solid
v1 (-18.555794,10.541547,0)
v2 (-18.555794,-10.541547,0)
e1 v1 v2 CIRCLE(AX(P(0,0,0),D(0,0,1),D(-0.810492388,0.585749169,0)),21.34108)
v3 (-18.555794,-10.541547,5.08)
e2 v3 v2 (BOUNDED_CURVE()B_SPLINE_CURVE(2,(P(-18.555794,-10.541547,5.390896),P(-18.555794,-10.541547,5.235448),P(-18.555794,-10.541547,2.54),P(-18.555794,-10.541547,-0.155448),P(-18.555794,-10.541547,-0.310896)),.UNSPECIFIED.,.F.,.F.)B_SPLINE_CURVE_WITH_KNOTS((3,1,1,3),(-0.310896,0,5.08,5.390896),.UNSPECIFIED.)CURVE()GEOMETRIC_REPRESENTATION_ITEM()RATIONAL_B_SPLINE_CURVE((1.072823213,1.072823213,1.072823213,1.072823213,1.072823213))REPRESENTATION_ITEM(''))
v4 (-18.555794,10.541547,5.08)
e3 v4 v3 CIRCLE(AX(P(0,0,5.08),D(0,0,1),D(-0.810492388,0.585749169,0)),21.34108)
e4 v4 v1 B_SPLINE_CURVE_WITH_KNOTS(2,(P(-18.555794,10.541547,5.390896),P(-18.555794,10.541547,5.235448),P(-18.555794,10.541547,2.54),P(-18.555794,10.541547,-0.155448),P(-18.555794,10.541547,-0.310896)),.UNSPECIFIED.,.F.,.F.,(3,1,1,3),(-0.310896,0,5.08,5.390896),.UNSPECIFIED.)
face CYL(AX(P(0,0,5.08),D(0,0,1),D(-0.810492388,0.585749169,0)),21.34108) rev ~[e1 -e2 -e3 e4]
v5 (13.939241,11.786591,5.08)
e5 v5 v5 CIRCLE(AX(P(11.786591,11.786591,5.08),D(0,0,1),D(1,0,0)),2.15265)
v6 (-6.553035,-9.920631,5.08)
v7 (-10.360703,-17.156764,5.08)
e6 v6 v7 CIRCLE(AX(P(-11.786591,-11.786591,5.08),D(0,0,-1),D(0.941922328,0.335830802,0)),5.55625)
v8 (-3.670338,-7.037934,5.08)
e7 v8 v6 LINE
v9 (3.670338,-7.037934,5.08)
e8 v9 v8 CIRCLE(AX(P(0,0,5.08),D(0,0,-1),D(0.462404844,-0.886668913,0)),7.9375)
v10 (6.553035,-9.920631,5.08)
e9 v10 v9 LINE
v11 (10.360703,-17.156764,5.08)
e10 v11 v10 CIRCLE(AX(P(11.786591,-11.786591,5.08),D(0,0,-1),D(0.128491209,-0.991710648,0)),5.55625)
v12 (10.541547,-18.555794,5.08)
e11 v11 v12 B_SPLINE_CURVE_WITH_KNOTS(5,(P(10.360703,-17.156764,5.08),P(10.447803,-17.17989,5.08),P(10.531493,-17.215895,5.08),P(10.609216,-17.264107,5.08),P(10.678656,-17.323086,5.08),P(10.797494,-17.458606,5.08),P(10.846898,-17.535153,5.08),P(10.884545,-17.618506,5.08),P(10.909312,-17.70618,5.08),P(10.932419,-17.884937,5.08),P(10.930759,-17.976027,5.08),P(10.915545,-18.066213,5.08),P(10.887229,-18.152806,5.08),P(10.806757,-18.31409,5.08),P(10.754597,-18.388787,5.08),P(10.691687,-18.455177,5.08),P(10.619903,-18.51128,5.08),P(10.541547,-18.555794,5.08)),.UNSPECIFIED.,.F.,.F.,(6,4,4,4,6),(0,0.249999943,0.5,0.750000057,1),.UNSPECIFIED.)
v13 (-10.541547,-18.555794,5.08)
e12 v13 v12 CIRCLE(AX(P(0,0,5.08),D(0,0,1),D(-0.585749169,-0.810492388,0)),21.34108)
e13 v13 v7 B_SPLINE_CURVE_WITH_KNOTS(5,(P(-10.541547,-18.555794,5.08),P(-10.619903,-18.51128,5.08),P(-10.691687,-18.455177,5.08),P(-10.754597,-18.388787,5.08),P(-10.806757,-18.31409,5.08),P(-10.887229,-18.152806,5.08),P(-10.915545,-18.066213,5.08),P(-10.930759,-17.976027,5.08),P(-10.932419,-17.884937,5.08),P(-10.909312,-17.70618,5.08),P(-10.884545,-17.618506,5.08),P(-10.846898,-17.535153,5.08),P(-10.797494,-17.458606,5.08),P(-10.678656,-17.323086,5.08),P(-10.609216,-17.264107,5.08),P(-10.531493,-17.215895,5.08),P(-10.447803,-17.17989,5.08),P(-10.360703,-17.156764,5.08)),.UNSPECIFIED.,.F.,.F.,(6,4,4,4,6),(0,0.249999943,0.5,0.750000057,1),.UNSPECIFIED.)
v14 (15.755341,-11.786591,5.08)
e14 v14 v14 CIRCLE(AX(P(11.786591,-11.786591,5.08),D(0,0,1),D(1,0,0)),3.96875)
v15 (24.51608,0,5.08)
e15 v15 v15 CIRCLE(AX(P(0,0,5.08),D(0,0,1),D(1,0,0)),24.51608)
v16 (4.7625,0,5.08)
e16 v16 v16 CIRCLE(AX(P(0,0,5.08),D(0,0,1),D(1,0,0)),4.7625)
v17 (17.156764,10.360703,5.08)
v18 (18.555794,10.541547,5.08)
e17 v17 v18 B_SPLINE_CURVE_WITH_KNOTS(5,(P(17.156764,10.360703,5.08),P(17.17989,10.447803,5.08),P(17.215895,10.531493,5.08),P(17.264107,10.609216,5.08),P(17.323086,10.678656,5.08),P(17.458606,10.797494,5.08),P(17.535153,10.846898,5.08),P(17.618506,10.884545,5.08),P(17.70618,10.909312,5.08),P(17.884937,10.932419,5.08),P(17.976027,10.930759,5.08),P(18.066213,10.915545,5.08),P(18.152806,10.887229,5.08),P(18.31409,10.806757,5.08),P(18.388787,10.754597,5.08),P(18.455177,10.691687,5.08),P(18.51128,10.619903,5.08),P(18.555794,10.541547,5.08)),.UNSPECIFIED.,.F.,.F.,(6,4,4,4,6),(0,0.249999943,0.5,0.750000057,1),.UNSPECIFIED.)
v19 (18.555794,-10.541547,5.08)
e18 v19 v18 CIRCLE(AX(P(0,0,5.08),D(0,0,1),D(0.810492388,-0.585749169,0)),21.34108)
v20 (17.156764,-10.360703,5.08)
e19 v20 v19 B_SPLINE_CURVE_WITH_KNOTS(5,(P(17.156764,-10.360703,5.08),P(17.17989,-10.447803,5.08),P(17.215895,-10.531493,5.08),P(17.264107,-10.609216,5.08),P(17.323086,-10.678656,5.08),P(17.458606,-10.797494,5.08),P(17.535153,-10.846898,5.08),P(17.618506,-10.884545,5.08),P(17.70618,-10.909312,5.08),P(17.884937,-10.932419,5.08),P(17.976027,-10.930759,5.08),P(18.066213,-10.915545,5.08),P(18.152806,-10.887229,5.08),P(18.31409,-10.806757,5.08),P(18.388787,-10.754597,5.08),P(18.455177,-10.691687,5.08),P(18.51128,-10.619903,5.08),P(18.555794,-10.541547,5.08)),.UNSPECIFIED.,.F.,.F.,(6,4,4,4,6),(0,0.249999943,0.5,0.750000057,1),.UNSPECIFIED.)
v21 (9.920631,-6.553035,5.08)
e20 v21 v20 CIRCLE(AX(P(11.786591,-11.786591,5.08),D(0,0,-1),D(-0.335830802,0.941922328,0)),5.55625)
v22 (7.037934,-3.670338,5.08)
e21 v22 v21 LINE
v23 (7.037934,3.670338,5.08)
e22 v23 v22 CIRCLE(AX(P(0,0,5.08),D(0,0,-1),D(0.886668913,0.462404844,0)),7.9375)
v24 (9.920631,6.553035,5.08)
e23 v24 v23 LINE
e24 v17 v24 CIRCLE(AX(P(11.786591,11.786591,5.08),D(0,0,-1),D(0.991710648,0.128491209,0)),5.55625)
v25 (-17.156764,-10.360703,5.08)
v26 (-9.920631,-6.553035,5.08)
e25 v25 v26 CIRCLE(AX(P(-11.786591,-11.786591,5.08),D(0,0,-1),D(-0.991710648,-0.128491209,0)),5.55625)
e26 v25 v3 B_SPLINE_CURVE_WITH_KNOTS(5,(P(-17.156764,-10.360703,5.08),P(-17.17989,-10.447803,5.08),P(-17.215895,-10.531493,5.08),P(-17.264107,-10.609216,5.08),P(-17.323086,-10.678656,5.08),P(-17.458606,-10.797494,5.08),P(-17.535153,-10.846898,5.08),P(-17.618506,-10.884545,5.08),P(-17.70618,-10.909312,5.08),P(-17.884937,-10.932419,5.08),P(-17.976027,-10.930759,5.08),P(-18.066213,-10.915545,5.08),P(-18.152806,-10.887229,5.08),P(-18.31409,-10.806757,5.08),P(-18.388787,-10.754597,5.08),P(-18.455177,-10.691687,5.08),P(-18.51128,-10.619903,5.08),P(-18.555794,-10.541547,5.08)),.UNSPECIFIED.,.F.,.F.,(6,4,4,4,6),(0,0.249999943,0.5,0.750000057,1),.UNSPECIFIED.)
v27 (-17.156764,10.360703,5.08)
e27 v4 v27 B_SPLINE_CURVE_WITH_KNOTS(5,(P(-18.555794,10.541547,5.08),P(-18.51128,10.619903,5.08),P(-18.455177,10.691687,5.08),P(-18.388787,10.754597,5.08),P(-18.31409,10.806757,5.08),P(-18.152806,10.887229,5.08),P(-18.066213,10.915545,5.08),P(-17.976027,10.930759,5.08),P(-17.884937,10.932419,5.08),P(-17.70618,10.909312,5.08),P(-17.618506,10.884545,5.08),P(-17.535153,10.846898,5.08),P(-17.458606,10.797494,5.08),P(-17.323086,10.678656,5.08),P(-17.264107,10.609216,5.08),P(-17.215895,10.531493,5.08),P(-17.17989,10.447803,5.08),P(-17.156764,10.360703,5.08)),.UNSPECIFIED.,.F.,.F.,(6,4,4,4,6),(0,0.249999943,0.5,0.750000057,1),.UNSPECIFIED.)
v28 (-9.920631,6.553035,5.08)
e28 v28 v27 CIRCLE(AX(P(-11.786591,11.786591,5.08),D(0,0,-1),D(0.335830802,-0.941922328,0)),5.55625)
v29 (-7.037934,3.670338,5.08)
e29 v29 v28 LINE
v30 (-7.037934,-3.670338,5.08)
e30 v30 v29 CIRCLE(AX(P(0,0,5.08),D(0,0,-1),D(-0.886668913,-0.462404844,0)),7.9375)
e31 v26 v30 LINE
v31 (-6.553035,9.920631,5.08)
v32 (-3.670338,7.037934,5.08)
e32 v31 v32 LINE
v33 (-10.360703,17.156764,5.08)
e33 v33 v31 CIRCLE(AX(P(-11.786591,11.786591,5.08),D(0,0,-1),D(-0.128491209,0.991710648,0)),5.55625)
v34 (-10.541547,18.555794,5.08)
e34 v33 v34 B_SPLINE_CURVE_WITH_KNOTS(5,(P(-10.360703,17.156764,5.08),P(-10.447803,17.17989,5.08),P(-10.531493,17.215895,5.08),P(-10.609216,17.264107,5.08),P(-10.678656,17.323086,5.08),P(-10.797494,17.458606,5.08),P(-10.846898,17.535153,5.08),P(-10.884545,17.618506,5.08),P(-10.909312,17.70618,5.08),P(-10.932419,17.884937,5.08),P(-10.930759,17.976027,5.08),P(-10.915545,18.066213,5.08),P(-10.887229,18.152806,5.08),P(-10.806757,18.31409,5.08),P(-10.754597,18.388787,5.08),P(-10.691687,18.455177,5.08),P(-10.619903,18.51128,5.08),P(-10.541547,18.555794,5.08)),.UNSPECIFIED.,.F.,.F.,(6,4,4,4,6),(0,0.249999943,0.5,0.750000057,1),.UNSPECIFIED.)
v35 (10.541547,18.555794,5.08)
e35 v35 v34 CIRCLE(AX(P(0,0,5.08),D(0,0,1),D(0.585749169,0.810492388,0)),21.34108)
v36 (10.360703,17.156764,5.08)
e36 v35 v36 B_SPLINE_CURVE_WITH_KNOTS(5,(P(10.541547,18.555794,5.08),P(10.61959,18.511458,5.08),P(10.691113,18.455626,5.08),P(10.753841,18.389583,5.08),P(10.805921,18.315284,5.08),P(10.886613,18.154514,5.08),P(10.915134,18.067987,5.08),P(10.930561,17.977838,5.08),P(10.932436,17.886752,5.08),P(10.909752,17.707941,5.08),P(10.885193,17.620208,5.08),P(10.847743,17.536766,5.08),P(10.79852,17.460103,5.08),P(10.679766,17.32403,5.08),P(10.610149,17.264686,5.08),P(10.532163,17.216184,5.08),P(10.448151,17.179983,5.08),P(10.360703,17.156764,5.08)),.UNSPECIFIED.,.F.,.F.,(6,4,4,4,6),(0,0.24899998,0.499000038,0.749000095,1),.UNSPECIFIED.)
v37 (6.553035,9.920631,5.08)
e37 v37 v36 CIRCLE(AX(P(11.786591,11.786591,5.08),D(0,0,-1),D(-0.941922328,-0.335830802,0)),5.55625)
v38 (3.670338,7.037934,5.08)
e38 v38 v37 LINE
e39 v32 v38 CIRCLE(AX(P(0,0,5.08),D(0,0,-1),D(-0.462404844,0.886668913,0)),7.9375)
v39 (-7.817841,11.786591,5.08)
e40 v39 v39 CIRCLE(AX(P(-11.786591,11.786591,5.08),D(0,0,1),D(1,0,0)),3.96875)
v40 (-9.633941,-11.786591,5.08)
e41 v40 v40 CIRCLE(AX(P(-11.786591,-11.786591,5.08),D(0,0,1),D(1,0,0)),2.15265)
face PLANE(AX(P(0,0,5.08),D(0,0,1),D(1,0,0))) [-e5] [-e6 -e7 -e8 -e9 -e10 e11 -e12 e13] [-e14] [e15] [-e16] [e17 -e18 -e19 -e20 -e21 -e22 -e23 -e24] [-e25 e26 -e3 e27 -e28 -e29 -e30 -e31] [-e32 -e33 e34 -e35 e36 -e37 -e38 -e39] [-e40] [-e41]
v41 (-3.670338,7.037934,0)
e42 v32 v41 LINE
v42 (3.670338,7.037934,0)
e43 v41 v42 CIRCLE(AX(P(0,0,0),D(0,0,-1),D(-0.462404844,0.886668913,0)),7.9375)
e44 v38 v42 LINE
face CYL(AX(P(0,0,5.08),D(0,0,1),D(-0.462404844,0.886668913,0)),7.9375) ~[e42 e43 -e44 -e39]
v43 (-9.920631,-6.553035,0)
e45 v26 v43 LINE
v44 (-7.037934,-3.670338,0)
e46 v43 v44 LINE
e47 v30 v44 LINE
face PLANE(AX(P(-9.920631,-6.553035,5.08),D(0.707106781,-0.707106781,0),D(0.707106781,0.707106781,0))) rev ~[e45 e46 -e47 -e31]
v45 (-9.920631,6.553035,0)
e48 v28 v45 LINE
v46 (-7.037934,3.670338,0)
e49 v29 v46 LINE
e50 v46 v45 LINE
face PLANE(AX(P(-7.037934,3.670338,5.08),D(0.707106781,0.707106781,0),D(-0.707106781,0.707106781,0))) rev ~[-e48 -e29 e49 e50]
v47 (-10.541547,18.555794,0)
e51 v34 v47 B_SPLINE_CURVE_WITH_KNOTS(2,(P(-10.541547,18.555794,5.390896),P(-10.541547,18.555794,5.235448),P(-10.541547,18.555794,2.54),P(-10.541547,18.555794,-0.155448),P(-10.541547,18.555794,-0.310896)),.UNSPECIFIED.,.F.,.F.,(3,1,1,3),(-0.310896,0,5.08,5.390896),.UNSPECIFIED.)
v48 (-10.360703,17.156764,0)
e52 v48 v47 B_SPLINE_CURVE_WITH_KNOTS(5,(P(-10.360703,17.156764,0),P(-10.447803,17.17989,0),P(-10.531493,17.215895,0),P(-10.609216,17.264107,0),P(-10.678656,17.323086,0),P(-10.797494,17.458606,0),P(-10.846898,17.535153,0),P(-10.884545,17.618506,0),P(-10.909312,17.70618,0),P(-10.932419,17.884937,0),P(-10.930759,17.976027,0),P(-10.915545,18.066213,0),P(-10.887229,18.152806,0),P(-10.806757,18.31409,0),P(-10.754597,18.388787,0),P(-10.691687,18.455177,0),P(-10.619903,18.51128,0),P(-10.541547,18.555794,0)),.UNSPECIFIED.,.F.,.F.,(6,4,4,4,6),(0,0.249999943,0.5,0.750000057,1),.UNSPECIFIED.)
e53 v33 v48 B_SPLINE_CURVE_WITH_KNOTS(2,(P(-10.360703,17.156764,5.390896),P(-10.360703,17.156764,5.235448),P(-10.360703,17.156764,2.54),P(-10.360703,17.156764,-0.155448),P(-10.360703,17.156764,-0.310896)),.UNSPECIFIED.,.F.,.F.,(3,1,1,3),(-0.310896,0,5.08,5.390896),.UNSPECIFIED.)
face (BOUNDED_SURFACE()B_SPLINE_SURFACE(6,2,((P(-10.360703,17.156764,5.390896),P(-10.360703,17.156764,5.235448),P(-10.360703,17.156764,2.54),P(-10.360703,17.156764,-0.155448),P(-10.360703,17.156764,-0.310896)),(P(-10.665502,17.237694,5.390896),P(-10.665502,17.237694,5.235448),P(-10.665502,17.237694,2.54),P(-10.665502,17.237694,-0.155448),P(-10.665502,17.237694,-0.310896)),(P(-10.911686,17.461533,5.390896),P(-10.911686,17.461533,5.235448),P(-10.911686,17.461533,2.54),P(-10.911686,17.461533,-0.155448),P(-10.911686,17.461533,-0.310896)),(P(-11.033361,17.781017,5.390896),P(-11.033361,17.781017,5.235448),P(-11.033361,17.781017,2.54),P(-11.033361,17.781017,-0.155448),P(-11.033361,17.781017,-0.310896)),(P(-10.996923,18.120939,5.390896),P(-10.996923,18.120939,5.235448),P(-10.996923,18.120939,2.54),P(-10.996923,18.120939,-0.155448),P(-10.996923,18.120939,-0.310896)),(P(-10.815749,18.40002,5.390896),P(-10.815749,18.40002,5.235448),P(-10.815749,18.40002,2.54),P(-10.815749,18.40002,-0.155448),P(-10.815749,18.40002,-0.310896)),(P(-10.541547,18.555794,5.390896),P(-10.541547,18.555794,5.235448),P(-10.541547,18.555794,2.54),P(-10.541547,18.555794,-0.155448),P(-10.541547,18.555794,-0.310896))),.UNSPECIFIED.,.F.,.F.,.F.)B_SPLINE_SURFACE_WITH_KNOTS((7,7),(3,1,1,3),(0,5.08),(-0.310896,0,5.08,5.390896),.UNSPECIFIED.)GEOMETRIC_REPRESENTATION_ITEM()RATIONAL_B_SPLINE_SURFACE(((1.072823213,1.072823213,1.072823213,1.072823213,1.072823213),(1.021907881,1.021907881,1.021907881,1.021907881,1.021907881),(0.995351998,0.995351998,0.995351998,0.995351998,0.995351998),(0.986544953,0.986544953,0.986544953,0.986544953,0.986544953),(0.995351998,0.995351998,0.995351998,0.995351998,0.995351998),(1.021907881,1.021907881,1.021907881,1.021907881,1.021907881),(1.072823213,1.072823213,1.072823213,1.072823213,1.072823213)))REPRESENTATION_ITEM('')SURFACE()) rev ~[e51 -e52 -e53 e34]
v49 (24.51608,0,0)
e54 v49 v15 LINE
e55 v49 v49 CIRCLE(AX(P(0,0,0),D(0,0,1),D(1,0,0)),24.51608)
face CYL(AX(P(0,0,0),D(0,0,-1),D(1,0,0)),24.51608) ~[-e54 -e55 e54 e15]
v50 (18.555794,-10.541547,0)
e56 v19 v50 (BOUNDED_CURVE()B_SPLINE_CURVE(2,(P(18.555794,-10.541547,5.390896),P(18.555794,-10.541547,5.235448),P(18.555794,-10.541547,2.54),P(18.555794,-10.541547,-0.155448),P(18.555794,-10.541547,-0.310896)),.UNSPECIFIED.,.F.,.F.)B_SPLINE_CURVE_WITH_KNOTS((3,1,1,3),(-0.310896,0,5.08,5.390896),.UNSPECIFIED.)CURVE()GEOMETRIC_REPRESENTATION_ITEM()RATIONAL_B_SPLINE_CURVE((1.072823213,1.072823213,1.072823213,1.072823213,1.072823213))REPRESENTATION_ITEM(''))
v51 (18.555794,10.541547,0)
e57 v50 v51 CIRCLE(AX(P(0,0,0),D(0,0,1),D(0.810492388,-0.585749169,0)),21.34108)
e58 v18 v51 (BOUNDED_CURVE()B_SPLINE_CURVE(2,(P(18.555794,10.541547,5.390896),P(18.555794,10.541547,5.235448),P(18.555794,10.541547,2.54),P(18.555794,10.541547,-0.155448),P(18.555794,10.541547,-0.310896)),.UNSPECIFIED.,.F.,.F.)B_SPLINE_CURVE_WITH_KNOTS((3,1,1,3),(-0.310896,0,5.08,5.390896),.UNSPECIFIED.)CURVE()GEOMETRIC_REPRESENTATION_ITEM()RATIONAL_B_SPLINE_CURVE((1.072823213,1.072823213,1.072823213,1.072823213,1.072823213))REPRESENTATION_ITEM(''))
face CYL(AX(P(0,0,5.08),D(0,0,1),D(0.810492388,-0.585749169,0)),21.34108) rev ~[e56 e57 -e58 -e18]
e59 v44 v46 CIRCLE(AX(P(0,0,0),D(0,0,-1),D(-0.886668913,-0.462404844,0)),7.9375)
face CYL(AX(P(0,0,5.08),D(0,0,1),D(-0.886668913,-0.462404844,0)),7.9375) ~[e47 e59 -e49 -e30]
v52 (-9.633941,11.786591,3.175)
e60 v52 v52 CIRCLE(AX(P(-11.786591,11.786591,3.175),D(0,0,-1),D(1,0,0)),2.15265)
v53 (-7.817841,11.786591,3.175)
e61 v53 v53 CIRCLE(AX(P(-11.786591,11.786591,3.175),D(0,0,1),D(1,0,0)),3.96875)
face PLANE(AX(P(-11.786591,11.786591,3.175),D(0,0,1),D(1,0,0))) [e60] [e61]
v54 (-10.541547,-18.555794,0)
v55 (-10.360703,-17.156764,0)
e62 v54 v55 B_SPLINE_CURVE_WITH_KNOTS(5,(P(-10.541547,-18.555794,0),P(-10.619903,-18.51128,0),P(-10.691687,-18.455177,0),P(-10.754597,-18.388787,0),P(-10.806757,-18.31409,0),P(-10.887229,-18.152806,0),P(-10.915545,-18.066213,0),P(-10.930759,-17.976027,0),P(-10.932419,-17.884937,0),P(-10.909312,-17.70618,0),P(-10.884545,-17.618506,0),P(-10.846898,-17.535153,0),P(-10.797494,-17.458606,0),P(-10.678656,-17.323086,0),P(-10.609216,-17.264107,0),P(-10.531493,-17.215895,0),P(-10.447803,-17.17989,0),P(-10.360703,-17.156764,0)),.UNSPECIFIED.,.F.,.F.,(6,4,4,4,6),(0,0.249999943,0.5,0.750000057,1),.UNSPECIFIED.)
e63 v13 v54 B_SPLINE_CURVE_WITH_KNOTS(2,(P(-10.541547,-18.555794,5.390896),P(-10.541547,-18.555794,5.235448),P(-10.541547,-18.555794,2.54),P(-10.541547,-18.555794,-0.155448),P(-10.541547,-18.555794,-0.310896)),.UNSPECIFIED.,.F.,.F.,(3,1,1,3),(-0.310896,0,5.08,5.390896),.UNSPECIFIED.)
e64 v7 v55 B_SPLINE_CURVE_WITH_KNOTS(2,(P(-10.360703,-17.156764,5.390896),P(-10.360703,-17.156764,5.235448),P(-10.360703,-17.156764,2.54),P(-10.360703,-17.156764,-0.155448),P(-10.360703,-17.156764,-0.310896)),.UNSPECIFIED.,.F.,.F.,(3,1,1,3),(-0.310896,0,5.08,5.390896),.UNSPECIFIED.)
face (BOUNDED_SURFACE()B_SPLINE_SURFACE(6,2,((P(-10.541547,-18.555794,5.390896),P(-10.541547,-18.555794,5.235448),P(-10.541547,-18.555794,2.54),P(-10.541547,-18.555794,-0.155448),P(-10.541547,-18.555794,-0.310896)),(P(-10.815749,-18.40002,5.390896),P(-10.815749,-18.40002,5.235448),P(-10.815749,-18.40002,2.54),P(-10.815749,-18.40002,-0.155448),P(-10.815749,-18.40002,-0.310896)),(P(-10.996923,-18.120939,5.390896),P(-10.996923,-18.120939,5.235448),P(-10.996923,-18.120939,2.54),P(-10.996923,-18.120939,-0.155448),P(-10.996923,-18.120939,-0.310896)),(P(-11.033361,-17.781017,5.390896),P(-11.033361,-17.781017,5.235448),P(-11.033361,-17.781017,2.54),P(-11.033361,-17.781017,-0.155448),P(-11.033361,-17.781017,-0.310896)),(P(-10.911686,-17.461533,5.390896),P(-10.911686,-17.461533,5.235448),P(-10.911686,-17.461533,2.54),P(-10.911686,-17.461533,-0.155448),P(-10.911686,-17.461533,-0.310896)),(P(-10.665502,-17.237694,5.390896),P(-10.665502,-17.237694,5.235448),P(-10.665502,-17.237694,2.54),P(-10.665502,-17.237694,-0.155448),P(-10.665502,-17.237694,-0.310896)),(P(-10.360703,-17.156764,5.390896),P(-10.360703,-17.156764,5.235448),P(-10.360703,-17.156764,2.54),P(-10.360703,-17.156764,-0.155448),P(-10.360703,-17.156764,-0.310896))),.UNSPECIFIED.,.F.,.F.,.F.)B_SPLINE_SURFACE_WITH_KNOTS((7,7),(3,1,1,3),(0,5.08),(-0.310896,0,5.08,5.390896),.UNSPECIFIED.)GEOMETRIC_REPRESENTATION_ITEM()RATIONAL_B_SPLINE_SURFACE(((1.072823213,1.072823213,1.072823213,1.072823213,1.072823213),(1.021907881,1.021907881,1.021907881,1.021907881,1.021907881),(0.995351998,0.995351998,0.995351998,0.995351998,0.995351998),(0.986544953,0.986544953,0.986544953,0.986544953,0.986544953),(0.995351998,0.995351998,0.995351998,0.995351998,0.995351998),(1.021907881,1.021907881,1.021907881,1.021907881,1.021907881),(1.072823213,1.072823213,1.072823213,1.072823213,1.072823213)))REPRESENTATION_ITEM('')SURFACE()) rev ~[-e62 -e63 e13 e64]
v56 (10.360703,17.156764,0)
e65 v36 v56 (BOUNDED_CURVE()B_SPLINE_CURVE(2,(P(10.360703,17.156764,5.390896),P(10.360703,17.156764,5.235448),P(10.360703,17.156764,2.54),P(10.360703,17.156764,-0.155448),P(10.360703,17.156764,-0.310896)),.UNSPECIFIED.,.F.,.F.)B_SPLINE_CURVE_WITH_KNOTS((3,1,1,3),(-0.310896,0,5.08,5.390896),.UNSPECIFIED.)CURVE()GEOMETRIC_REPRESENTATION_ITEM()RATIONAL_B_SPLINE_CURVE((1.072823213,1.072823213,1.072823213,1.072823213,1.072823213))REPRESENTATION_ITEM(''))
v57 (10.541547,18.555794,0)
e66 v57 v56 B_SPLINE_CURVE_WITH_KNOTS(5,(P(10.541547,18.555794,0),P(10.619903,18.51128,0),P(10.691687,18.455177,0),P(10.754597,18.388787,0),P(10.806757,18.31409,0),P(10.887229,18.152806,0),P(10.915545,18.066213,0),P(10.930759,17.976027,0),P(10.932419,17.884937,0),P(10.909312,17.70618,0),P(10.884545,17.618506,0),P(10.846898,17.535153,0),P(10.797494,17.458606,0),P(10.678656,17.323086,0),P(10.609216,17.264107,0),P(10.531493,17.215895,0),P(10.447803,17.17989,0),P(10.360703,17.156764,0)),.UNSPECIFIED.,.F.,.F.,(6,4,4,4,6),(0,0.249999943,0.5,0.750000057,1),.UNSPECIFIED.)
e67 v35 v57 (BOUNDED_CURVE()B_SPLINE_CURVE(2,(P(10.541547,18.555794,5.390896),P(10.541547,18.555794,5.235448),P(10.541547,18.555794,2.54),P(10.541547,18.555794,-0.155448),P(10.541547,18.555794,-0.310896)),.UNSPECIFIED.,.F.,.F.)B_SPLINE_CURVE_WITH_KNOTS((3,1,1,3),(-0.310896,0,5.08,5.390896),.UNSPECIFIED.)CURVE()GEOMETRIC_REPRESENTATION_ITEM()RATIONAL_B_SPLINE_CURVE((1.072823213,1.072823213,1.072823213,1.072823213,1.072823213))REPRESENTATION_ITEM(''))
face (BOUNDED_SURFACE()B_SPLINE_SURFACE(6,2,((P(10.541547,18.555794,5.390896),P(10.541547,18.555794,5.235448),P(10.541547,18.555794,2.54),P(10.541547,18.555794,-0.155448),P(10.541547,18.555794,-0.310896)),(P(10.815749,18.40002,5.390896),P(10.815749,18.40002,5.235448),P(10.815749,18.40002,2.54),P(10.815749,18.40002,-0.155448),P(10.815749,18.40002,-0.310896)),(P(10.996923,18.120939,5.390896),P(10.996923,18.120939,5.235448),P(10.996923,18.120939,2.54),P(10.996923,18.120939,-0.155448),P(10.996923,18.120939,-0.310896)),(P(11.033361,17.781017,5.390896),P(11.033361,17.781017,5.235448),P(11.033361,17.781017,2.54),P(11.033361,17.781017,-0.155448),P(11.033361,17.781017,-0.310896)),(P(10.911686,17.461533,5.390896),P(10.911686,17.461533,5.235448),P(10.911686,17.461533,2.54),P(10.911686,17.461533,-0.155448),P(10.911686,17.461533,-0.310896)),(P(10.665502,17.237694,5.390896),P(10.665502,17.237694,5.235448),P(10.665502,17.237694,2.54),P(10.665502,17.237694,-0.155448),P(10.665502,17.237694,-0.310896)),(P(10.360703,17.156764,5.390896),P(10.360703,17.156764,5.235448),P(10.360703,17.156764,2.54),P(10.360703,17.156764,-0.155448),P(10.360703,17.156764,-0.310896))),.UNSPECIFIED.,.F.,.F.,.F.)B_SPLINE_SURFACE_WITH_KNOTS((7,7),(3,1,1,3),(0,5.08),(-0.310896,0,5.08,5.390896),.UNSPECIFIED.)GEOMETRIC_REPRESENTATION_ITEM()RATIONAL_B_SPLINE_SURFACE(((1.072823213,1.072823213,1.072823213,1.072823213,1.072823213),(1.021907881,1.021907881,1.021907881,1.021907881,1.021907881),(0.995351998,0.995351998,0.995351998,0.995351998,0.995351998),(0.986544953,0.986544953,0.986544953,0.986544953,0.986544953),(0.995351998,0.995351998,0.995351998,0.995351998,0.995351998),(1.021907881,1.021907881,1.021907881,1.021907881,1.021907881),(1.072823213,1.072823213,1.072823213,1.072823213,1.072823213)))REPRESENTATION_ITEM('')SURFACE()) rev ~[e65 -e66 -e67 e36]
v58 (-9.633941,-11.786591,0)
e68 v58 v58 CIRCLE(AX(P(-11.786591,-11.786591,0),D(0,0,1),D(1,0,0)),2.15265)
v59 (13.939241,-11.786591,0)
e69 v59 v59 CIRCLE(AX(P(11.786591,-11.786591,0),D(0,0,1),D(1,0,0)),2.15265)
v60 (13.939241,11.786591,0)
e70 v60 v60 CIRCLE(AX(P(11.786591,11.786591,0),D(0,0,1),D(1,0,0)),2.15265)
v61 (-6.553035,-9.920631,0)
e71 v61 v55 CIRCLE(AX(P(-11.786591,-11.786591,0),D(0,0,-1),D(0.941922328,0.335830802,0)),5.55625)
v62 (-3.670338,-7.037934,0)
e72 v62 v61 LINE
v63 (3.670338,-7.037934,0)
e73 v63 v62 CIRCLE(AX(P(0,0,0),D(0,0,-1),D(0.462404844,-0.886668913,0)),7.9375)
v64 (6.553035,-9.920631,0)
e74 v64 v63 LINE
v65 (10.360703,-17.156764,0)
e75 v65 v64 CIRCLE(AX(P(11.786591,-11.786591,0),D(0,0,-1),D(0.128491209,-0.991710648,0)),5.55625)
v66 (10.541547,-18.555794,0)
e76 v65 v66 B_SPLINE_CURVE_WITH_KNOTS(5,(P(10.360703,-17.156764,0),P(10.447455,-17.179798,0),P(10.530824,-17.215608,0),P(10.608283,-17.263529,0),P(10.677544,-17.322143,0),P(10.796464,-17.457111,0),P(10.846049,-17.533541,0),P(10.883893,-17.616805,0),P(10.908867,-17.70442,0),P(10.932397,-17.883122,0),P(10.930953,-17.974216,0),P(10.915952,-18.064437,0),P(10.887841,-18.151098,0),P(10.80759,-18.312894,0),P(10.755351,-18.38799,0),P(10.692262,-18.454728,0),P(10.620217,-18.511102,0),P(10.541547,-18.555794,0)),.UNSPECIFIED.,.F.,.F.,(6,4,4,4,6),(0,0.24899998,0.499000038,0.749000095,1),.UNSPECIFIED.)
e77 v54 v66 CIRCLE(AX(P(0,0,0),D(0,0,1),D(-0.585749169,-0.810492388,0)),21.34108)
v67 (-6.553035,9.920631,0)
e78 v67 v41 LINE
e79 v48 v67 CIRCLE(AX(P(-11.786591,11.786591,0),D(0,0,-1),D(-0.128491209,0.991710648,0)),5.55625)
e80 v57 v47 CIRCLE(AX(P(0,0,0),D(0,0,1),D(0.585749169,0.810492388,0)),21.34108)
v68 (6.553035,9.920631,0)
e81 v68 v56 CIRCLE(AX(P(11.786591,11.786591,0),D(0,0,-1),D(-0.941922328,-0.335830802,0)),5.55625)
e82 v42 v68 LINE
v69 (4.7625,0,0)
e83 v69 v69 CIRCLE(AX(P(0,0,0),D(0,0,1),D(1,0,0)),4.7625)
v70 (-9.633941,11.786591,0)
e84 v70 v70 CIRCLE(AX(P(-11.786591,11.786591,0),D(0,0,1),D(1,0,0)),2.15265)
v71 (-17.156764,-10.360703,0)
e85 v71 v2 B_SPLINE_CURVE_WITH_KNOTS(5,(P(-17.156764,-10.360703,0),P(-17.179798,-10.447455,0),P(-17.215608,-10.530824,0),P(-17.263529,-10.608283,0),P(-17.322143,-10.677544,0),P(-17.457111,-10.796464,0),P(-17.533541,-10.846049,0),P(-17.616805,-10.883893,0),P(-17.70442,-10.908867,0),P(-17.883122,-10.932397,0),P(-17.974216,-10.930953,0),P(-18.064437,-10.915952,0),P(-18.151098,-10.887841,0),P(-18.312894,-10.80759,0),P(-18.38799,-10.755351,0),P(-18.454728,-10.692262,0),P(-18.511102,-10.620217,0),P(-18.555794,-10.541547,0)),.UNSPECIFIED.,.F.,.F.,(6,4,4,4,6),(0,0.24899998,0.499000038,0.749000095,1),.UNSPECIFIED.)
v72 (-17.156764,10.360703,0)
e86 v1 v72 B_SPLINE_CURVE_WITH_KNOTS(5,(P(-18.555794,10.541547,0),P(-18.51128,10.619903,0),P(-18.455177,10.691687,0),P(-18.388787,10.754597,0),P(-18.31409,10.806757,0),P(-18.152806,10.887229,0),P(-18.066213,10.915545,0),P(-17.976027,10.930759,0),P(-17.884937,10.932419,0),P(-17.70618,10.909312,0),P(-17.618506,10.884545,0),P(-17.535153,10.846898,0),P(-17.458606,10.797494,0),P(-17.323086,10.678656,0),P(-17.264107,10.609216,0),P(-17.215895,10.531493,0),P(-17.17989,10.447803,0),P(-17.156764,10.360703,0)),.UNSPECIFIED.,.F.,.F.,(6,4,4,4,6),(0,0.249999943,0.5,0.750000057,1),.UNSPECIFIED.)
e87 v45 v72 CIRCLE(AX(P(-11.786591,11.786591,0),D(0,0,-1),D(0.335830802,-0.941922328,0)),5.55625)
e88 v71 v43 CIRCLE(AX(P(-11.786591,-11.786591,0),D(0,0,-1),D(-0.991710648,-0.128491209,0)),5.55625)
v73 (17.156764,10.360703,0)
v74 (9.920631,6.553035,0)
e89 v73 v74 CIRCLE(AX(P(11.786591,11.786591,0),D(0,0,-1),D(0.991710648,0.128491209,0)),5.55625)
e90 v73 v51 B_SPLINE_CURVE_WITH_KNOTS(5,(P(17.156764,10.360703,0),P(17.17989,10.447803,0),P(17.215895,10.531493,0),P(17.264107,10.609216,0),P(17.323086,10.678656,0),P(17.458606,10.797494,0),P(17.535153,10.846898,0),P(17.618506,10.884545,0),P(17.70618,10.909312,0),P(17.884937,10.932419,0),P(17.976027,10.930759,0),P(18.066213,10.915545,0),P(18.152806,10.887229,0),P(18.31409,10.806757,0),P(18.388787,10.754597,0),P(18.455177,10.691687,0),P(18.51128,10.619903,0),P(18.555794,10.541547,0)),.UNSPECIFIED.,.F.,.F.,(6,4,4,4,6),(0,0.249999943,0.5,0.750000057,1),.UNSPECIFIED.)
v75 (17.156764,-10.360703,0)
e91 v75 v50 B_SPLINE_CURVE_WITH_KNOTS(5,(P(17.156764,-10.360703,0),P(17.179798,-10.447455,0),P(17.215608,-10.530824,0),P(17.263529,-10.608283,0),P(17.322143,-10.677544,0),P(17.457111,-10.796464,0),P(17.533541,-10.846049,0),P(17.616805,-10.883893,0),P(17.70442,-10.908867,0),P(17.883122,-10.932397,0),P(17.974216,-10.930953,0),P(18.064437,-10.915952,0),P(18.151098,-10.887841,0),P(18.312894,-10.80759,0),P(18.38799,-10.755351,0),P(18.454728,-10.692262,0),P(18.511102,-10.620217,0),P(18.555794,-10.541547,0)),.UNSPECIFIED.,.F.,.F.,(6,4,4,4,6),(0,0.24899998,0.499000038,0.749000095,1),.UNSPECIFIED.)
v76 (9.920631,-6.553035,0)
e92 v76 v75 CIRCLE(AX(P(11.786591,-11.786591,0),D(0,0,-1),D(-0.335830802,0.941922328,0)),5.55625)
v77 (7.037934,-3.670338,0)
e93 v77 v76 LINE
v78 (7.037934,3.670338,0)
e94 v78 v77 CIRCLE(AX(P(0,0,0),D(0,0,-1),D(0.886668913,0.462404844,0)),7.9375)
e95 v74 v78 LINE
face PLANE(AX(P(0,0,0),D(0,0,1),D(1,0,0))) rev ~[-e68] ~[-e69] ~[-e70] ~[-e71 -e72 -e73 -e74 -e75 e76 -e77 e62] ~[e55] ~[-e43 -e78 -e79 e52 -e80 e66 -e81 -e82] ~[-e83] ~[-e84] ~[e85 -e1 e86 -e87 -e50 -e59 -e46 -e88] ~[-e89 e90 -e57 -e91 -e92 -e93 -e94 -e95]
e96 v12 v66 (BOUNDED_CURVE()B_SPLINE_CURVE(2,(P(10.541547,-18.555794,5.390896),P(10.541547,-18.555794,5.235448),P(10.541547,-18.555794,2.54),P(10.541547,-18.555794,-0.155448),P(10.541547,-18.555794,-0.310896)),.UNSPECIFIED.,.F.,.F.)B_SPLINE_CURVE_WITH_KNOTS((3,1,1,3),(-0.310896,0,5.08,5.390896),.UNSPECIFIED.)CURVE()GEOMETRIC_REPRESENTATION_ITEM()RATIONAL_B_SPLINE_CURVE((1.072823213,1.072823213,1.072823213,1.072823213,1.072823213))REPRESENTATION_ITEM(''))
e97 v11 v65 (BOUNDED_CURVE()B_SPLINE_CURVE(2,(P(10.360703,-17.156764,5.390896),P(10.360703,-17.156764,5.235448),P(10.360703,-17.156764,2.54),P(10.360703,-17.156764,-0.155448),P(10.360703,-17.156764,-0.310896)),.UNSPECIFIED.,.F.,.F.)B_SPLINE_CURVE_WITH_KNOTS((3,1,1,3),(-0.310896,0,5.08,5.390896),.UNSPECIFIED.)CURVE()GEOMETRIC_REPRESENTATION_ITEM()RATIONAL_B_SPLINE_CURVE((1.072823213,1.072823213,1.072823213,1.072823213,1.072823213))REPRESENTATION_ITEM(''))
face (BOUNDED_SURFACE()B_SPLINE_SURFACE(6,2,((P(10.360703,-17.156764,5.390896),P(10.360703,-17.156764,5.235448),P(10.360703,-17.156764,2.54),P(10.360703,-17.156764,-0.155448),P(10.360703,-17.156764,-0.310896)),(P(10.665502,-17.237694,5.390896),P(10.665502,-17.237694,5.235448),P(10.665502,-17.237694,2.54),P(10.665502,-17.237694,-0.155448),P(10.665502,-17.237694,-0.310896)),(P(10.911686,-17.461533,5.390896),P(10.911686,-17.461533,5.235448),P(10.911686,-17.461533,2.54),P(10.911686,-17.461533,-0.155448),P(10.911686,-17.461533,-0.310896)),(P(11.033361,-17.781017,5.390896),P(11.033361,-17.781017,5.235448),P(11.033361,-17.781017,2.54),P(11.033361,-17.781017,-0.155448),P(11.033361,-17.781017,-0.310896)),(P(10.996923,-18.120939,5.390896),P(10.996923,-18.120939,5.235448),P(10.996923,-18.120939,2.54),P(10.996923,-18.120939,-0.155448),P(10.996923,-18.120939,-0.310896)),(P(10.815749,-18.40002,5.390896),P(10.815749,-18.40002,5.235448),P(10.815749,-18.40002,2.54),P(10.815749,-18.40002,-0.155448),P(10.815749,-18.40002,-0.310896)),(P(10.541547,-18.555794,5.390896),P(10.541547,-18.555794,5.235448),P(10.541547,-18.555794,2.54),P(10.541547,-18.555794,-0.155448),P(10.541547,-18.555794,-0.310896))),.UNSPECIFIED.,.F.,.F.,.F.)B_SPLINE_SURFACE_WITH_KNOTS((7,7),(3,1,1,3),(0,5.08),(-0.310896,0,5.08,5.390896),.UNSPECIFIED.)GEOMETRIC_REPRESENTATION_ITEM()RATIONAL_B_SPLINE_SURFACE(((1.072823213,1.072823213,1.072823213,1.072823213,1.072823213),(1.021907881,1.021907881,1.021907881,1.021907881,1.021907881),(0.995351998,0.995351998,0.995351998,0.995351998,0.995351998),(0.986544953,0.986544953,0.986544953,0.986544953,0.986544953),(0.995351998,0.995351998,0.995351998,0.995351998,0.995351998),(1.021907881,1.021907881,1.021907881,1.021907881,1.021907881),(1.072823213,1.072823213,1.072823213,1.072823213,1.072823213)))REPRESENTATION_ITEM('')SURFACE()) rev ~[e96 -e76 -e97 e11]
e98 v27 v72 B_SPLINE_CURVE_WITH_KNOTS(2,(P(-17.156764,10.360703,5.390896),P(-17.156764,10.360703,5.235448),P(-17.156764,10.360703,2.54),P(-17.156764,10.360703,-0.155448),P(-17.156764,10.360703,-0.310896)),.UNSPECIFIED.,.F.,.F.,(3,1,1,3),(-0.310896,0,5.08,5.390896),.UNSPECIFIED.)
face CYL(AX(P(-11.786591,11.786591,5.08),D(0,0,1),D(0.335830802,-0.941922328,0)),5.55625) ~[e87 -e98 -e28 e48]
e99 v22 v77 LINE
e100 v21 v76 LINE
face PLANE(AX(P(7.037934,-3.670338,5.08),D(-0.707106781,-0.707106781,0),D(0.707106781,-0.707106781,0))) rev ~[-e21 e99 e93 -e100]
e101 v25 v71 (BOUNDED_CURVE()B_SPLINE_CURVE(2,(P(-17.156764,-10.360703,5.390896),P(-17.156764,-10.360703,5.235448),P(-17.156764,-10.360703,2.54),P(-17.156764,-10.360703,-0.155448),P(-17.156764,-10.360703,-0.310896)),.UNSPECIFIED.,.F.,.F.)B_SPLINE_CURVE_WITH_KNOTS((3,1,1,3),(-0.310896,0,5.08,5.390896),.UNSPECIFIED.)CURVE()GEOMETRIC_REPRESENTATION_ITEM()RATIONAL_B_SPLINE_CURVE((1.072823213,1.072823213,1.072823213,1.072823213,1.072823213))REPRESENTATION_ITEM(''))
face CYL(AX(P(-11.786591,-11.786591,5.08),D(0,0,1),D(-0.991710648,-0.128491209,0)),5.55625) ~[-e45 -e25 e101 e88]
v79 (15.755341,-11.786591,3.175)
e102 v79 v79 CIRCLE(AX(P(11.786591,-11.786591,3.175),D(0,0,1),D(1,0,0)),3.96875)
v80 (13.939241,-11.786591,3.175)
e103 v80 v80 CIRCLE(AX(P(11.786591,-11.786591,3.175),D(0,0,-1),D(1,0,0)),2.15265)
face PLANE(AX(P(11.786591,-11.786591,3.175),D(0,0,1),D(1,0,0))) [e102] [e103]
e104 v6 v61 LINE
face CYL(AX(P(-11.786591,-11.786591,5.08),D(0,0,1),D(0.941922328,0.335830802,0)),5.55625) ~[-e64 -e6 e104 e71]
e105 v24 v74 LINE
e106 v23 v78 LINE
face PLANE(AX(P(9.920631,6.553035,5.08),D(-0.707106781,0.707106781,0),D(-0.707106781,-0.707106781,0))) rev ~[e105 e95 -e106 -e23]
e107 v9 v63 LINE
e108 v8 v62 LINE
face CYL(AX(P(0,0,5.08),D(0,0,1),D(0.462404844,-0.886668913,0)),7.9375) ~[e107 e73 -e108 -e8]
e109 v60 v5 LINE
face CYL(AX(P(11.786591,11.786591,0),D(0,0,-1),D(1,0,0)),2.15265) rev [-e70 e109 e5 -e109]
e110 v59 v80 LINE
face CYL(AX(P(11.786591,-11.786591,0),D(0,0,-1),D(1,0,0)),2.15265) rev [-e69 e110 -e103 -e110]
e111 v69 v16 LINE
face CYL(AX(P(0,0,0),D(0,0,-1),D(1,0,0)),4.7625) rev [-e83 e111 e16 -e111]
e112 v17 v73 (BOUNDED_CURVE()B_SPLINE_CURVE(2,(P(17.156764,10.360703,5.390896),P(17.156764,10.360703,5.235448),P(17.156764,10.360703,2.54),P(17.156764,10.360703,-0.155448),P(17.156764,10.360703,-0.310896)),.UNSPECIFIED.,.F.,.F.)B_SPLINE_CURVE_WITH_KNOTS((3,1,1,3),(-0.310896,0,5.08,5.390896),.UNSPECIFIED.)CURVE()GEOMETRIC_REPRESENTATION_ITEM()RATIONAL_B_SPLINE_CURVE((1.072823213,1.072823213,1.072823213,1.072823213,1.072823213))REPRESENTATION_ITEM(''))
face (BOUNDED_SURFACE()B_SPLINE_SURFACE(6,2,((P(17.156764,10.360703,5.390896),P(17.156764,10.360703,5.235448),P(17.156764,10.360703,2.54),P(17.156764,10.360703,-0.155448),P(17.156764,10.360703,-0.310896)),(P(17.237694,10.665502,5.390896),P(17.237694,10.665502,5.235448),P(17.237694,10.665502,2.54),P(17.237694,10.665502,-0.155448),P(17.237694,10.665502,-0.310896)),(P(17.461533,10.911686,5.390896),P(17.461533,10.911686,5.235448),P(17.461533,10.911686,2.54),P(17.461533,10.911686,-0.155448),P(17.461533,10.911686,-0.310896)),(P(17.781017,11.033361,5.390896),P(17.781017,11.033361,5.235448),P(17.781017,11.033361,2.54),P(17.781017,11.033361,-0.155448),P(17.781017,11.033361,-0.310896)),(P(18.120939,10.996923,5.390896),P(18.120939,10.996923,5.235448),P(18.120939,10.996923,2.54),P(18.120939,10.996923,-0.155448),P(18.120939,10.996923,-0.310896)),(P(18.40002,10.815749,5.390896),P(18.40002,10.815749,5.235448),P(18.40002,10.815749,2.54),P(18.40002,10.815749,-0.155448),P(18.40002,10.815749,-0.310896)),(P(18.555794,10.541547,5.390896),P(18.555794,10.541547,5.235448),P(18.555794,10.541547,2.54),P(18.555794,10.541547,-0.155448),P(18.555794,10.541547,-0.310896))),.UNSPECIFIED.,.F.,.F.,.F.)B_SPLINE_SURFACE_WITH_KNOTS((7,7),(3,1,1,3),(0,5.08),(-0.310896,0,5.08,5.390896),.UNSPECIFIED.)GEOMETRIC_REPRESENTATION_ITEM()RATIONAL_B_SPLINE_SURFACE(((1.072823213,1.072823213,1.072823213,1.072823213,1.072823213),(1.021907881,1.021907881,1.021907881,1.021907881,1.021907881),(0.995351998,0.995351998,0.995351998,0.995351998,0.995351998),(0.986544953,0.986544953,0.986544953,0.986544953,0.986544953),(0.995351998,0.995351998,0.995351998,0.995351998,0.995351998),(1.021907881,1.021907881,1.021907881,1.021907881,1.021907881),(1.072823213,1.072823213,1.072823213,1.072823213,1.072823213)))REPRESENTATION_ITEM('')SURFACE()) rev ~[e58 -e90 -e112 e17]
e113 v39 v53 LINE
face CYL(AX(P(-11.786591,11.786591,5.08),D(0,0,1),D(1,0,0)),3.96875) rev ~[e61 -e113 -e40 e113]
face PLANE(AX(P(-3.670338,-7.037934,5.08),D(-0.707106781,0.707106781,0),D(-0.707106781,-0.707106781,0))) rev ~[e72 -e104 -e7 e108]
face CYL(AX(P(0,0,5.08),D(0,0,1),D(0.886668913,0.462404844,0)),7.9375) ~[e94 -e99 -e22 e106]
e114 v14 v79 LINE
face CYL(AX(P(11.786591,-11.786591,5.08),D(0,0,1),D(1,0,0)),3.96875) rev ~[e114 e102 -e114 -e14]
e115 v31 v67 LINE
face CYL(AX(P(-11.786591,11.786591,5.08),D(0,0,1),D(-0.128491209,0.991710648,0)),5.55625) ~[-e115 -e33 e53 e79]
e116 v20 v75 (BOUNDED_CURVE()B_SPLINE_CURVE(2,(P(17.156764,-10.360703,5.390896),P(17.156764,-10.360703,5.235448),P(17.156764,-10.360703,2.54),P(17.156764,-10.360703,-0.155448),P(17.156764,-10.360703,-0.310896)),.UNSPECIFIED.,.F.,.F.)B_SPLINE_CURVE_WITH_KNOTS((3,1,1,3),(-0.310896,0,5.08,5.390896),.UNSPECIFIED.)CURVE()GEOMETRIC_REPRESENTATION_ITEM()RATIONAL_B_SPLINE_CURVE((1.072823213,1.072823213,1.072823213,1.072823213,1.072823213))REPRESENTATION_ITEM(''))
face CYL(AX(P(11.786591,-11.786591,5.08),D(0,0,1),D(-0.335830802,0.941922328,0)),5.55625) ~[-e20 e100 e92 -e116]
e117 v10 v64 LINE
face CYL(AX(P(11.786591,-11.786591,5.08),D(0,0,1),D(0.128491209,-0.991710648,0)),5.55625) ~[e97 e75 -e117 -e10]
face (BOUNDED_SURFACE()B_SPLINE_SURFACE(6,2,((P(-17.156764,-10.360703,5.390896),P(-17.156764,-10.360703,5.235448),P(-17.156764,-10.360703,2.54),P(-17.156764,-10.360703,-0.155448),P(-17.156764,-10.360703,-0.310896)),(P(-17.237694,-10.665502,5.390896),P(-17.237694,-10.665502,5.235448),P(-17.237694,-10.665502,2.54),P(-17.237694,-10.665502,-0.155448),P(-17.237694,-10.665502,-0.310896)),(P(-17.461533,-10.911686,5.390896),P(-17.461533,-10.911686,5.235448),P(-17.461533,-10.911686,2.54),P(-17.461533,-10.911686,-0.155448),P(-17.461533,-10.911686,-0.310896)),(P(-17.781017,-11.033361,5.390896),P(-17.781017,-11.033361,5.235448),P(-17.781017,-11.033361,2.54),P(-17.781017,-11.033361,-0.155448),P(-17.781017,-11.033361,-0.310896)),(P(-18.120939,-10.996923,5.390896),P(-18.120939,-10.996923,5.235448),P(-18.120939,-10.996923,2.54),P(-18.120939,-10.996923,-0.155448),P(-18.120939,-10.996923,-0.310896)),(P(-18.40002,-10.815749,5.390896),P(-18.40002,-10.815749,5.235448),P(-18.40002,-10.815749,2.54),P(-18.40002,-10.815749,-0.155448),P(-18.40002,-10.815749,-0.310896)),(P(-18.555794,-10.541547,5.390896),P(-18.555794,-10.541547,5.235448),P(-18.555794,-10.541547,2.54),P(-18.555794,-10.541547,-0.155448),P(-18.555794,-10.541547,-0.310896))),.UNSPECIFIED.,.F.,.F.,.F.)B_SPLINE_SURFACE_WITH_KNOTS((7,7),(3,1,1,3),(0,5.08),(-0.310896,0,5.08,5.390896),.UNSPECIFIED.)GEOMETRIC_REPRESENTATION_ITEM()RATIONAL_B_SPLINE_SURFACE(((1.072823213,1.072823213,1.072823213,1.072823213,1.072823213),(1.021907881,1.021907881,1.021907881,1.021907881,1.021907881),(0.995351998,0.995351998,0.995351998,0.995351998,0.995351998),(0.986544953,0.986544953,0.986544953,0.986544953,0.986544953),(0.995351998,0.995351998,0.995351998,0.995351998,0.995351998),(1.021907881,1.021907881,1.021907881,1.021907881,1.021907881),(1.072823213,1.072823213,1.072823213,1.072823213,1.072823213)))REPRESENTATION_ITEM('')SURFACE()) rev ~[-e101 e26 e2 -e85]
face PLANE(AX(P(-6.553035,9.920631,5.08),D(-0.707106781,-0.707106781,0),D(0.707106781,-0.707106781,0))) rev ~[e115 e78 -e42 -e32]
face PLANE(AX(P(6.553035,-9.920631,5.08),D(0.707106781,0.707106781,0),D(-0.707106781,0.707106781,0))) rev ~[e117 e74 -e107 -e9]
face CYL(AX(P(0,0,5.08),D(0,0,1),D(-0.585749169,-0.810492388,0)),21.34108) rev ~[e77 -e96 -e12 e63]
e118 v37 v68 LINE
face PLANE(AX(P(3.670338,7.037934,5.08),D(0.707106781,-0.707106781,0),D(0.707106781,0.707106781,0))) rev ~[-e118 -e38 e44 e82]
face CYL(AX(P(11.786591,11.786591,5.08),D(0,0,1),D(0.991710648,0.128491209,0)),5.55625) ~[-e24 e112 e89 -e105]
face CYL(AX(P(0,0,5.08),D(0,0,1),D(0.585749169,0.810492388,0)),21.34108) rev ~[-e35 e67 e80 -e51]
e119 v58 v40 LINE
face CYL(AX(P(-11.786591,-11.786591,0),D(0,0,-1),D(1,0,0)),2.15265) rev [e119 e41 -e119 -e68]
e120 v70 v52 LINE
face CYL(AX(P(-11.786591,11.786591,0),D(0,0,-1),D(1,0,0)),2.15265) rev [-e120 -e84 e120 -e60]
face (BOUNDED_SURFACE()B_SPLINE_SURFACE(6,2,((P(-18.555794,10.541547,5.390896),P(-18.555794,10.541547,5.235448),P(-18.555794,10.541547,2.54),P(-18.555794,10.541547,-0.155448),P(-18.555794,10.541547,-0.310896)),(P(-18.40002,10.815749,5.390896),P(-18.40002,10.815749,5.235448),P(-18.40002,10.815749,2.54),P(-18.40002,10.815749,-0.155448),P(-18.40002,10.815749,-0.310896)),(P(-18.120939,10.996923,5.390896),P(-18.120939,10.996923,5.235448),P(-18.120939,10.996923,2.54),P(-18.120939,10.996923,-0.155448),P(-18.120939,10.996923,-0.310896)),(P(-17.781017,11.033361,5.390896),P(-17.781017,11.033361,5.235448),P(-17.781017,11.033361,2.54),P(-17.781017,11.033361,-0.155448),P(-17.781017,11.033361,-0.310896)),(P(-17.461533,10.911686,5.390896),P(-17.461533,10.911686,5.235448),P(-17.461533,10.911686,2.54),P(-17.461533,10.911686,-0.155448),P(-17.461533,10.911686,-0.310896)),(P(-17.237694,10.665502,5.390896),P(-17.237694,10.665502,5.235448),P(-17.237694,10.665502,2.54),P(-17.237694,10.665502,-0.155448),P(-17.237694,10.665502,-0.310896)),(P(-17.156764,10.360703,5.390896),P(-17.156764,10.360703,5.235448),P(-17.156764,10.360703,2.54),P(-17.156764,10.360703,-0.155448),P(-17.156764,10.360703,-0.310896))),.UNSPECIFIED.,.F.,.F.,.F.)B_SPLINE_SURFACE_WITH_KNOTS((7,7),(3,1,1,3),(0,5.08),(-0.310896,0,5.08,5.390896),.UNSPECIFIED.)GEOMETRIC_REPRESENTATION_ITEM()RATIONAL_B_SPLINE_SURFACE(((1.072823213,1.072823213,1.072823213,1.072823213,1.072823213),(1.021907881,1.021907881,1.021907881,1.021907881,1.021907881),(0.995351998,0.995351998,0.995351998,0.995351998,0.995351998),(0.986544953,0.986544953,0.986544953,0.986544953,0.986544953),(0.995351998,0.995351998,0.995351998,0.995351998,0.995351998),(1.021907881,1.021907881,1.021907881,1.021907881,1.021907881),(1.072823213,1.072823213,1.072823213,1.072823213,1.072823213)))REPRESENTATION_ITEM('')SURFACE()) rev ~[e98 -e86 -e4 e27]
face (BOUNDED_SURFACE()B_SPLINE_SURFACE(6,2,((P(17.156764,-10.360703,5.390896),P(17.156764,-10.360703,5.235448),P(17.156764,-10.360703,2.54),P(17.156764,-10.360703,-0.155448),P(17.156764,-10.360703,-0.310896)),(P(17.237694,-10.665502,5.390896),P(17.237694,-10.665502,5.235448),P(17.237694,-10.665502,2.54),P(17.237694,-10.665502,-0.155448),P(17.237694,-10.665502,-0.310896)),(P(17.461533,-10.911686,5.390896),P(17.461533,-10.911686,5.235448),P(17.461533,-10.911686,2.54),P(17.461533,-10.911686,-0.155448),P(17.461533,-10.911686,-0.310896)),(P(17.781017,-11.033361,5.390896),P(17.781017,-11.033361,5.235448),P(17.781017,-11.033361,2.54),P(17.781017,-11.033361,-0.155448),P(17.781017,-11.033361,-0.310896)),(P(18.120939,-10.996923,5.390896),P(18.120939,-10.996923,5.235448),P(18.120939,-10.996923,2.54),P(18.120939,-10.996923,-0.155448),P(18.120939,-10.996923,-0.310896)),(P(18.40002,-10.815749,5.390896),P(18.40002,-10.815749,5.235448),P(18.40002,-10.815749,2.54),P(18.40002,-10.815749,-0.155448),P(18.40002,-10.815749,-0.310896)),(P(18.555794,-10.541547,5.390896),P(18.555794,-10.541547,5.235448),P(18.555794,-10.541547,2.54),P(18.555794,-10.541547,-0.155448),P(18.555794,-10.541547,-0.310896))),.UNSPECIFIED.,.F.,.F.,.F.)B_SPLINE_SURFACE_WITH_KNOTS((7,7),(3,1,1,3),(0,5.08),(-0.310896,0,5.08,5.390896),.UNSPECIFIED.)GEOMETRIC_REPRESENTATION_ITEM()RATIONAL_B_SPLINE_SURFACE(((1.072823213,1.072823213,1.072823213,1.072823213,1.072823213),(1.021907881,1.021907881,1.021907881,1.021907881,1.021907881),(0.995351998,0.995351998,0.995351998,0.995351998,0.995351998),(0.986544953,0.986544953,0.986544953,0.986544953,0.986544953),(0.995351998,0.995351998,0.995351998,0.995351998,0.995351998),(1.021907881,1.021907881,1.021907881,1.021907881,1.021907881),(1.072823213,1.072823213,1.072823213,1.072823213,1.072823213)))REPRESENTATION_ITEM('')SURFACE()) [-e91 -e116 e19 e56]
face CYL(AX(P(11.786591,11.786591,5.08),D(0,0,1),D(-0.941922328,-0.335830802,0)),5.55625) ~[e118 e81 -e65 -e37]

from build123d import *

# Parameters (mm, degrees)
F0_R            = 24.51608
F0_R_2          = 2.15265
F0_R_3          = 4.7625
F1_DEPTH        = 5.08
F3_DEPTH        = 5.08
F3_COPIES_COUNT = 4
F4_R            = 0.762
F6_R            = 3.96875
F7_DEPTH        = 1.905


# Not quite as in the source:
# - a pattern or mirror of a feature is missing from the dataset's text; its kind, count and spacing are read off the source's solid


with BuildPart() as f1:
    # F0 (on Top) → F1 (new body)
    with BuildSketch(Plane.XY):
        Circle(F0_R)
        with Locations((-11.7865906, -11.7865906)):
            Circle(F0_R_2, mode=Mode.SUBTRACT)
        with Locations((11.7865906, -11.7865906)):
            Circle(F0_R_2, mode=Mode.SUBTRACT)
        with Locations((-11.7865906, 11.7865906)):
            Circle(F0_R_2, mode=Mode.SUBTRACT)
        Circle(F0_R_3, mode=Mode.SUBTRACT)
        with Locations((11.7865906, 11.7865906)):
            Circle(F0_R_2, mode=Mode.SUBTRACT)
    extrude(amount=F1_DEPTH)

    # F2 (on face) → F3 (cut, through all)
    with BuildSketch(Plane.XY.offset(5.08)):
        with BuildLine():
            ThreePointArc((-12.5005198818, 17.2967828873), (-7.4612395718, 15.2741760893), (-6.553034663, 9.9206307084))
            Line((-6.553034663, 9.9206307084), (-3.6703384477, 7.0379344931))
            ThreePointArc((-3.6703384477, 7.0379344931), (0, 7.9375), (3.6703384477, 7.0379344931))
            Line((3.6703384477, 7.0379344931), (6.553034663, 9.9206307084))
            ThreePointArc((6.553034663, 9.9206307084), (7.4612395718, 15.2741760893), (12.5005198818, 17.2967828873))
            ThreePointArc((12.5005198818, 17.2967828873), (0, 21.34108), (-12.5005198818, 17.2967828873))
        make_face()
    f3 = extrude(amount=-F3_DEPTH, mode=Mode.SUBTRACT)

    # F3_copies: F3 ×4 about axis
    f3_copies_axis = Axis((0, 0, 0), (0, 0, 1))
    for i in range(1, F3_COPIES_COUNT):
        add(f3.rotate(f3_copies_axis, i * 360 / F3_COPIES_COUNT), mode=Mode.SUBTRACT)

    # F4
    f4_edges = [f1.edges().sort_by_distance(p)[0] for p in [
        (-12.50052, 17.296783, 2.54),
        (12.50052, 17.296783, 2.54),
        (-17.296783, -12.50052, 2.54),
        (-17.296783, 12.50052, 2.54),
        (12.50052, -17.296783, 2.54),
        (-12.50052, -17.296783, 2.54),
        (17.296783, 12.50052, 2.54),
        (17.296783, -12.50052, 2.54),
    ]]
    fillet(f4_edges, radius=F4_R)

    # F6 (on face) → F7 (cut, through all)
    with BuildSketch(Plane.XY.offset(5.08)):
        with Locations((11.7865906, -11.7865906)):
            Circle(F6_R)
        with Locations((-11.7865906, 11.7865906)):
            Circle(F6_R)
    extrude(amount=-F7_DEPTH, mode=Mode.SUBTRACT)


solid = f1.part
